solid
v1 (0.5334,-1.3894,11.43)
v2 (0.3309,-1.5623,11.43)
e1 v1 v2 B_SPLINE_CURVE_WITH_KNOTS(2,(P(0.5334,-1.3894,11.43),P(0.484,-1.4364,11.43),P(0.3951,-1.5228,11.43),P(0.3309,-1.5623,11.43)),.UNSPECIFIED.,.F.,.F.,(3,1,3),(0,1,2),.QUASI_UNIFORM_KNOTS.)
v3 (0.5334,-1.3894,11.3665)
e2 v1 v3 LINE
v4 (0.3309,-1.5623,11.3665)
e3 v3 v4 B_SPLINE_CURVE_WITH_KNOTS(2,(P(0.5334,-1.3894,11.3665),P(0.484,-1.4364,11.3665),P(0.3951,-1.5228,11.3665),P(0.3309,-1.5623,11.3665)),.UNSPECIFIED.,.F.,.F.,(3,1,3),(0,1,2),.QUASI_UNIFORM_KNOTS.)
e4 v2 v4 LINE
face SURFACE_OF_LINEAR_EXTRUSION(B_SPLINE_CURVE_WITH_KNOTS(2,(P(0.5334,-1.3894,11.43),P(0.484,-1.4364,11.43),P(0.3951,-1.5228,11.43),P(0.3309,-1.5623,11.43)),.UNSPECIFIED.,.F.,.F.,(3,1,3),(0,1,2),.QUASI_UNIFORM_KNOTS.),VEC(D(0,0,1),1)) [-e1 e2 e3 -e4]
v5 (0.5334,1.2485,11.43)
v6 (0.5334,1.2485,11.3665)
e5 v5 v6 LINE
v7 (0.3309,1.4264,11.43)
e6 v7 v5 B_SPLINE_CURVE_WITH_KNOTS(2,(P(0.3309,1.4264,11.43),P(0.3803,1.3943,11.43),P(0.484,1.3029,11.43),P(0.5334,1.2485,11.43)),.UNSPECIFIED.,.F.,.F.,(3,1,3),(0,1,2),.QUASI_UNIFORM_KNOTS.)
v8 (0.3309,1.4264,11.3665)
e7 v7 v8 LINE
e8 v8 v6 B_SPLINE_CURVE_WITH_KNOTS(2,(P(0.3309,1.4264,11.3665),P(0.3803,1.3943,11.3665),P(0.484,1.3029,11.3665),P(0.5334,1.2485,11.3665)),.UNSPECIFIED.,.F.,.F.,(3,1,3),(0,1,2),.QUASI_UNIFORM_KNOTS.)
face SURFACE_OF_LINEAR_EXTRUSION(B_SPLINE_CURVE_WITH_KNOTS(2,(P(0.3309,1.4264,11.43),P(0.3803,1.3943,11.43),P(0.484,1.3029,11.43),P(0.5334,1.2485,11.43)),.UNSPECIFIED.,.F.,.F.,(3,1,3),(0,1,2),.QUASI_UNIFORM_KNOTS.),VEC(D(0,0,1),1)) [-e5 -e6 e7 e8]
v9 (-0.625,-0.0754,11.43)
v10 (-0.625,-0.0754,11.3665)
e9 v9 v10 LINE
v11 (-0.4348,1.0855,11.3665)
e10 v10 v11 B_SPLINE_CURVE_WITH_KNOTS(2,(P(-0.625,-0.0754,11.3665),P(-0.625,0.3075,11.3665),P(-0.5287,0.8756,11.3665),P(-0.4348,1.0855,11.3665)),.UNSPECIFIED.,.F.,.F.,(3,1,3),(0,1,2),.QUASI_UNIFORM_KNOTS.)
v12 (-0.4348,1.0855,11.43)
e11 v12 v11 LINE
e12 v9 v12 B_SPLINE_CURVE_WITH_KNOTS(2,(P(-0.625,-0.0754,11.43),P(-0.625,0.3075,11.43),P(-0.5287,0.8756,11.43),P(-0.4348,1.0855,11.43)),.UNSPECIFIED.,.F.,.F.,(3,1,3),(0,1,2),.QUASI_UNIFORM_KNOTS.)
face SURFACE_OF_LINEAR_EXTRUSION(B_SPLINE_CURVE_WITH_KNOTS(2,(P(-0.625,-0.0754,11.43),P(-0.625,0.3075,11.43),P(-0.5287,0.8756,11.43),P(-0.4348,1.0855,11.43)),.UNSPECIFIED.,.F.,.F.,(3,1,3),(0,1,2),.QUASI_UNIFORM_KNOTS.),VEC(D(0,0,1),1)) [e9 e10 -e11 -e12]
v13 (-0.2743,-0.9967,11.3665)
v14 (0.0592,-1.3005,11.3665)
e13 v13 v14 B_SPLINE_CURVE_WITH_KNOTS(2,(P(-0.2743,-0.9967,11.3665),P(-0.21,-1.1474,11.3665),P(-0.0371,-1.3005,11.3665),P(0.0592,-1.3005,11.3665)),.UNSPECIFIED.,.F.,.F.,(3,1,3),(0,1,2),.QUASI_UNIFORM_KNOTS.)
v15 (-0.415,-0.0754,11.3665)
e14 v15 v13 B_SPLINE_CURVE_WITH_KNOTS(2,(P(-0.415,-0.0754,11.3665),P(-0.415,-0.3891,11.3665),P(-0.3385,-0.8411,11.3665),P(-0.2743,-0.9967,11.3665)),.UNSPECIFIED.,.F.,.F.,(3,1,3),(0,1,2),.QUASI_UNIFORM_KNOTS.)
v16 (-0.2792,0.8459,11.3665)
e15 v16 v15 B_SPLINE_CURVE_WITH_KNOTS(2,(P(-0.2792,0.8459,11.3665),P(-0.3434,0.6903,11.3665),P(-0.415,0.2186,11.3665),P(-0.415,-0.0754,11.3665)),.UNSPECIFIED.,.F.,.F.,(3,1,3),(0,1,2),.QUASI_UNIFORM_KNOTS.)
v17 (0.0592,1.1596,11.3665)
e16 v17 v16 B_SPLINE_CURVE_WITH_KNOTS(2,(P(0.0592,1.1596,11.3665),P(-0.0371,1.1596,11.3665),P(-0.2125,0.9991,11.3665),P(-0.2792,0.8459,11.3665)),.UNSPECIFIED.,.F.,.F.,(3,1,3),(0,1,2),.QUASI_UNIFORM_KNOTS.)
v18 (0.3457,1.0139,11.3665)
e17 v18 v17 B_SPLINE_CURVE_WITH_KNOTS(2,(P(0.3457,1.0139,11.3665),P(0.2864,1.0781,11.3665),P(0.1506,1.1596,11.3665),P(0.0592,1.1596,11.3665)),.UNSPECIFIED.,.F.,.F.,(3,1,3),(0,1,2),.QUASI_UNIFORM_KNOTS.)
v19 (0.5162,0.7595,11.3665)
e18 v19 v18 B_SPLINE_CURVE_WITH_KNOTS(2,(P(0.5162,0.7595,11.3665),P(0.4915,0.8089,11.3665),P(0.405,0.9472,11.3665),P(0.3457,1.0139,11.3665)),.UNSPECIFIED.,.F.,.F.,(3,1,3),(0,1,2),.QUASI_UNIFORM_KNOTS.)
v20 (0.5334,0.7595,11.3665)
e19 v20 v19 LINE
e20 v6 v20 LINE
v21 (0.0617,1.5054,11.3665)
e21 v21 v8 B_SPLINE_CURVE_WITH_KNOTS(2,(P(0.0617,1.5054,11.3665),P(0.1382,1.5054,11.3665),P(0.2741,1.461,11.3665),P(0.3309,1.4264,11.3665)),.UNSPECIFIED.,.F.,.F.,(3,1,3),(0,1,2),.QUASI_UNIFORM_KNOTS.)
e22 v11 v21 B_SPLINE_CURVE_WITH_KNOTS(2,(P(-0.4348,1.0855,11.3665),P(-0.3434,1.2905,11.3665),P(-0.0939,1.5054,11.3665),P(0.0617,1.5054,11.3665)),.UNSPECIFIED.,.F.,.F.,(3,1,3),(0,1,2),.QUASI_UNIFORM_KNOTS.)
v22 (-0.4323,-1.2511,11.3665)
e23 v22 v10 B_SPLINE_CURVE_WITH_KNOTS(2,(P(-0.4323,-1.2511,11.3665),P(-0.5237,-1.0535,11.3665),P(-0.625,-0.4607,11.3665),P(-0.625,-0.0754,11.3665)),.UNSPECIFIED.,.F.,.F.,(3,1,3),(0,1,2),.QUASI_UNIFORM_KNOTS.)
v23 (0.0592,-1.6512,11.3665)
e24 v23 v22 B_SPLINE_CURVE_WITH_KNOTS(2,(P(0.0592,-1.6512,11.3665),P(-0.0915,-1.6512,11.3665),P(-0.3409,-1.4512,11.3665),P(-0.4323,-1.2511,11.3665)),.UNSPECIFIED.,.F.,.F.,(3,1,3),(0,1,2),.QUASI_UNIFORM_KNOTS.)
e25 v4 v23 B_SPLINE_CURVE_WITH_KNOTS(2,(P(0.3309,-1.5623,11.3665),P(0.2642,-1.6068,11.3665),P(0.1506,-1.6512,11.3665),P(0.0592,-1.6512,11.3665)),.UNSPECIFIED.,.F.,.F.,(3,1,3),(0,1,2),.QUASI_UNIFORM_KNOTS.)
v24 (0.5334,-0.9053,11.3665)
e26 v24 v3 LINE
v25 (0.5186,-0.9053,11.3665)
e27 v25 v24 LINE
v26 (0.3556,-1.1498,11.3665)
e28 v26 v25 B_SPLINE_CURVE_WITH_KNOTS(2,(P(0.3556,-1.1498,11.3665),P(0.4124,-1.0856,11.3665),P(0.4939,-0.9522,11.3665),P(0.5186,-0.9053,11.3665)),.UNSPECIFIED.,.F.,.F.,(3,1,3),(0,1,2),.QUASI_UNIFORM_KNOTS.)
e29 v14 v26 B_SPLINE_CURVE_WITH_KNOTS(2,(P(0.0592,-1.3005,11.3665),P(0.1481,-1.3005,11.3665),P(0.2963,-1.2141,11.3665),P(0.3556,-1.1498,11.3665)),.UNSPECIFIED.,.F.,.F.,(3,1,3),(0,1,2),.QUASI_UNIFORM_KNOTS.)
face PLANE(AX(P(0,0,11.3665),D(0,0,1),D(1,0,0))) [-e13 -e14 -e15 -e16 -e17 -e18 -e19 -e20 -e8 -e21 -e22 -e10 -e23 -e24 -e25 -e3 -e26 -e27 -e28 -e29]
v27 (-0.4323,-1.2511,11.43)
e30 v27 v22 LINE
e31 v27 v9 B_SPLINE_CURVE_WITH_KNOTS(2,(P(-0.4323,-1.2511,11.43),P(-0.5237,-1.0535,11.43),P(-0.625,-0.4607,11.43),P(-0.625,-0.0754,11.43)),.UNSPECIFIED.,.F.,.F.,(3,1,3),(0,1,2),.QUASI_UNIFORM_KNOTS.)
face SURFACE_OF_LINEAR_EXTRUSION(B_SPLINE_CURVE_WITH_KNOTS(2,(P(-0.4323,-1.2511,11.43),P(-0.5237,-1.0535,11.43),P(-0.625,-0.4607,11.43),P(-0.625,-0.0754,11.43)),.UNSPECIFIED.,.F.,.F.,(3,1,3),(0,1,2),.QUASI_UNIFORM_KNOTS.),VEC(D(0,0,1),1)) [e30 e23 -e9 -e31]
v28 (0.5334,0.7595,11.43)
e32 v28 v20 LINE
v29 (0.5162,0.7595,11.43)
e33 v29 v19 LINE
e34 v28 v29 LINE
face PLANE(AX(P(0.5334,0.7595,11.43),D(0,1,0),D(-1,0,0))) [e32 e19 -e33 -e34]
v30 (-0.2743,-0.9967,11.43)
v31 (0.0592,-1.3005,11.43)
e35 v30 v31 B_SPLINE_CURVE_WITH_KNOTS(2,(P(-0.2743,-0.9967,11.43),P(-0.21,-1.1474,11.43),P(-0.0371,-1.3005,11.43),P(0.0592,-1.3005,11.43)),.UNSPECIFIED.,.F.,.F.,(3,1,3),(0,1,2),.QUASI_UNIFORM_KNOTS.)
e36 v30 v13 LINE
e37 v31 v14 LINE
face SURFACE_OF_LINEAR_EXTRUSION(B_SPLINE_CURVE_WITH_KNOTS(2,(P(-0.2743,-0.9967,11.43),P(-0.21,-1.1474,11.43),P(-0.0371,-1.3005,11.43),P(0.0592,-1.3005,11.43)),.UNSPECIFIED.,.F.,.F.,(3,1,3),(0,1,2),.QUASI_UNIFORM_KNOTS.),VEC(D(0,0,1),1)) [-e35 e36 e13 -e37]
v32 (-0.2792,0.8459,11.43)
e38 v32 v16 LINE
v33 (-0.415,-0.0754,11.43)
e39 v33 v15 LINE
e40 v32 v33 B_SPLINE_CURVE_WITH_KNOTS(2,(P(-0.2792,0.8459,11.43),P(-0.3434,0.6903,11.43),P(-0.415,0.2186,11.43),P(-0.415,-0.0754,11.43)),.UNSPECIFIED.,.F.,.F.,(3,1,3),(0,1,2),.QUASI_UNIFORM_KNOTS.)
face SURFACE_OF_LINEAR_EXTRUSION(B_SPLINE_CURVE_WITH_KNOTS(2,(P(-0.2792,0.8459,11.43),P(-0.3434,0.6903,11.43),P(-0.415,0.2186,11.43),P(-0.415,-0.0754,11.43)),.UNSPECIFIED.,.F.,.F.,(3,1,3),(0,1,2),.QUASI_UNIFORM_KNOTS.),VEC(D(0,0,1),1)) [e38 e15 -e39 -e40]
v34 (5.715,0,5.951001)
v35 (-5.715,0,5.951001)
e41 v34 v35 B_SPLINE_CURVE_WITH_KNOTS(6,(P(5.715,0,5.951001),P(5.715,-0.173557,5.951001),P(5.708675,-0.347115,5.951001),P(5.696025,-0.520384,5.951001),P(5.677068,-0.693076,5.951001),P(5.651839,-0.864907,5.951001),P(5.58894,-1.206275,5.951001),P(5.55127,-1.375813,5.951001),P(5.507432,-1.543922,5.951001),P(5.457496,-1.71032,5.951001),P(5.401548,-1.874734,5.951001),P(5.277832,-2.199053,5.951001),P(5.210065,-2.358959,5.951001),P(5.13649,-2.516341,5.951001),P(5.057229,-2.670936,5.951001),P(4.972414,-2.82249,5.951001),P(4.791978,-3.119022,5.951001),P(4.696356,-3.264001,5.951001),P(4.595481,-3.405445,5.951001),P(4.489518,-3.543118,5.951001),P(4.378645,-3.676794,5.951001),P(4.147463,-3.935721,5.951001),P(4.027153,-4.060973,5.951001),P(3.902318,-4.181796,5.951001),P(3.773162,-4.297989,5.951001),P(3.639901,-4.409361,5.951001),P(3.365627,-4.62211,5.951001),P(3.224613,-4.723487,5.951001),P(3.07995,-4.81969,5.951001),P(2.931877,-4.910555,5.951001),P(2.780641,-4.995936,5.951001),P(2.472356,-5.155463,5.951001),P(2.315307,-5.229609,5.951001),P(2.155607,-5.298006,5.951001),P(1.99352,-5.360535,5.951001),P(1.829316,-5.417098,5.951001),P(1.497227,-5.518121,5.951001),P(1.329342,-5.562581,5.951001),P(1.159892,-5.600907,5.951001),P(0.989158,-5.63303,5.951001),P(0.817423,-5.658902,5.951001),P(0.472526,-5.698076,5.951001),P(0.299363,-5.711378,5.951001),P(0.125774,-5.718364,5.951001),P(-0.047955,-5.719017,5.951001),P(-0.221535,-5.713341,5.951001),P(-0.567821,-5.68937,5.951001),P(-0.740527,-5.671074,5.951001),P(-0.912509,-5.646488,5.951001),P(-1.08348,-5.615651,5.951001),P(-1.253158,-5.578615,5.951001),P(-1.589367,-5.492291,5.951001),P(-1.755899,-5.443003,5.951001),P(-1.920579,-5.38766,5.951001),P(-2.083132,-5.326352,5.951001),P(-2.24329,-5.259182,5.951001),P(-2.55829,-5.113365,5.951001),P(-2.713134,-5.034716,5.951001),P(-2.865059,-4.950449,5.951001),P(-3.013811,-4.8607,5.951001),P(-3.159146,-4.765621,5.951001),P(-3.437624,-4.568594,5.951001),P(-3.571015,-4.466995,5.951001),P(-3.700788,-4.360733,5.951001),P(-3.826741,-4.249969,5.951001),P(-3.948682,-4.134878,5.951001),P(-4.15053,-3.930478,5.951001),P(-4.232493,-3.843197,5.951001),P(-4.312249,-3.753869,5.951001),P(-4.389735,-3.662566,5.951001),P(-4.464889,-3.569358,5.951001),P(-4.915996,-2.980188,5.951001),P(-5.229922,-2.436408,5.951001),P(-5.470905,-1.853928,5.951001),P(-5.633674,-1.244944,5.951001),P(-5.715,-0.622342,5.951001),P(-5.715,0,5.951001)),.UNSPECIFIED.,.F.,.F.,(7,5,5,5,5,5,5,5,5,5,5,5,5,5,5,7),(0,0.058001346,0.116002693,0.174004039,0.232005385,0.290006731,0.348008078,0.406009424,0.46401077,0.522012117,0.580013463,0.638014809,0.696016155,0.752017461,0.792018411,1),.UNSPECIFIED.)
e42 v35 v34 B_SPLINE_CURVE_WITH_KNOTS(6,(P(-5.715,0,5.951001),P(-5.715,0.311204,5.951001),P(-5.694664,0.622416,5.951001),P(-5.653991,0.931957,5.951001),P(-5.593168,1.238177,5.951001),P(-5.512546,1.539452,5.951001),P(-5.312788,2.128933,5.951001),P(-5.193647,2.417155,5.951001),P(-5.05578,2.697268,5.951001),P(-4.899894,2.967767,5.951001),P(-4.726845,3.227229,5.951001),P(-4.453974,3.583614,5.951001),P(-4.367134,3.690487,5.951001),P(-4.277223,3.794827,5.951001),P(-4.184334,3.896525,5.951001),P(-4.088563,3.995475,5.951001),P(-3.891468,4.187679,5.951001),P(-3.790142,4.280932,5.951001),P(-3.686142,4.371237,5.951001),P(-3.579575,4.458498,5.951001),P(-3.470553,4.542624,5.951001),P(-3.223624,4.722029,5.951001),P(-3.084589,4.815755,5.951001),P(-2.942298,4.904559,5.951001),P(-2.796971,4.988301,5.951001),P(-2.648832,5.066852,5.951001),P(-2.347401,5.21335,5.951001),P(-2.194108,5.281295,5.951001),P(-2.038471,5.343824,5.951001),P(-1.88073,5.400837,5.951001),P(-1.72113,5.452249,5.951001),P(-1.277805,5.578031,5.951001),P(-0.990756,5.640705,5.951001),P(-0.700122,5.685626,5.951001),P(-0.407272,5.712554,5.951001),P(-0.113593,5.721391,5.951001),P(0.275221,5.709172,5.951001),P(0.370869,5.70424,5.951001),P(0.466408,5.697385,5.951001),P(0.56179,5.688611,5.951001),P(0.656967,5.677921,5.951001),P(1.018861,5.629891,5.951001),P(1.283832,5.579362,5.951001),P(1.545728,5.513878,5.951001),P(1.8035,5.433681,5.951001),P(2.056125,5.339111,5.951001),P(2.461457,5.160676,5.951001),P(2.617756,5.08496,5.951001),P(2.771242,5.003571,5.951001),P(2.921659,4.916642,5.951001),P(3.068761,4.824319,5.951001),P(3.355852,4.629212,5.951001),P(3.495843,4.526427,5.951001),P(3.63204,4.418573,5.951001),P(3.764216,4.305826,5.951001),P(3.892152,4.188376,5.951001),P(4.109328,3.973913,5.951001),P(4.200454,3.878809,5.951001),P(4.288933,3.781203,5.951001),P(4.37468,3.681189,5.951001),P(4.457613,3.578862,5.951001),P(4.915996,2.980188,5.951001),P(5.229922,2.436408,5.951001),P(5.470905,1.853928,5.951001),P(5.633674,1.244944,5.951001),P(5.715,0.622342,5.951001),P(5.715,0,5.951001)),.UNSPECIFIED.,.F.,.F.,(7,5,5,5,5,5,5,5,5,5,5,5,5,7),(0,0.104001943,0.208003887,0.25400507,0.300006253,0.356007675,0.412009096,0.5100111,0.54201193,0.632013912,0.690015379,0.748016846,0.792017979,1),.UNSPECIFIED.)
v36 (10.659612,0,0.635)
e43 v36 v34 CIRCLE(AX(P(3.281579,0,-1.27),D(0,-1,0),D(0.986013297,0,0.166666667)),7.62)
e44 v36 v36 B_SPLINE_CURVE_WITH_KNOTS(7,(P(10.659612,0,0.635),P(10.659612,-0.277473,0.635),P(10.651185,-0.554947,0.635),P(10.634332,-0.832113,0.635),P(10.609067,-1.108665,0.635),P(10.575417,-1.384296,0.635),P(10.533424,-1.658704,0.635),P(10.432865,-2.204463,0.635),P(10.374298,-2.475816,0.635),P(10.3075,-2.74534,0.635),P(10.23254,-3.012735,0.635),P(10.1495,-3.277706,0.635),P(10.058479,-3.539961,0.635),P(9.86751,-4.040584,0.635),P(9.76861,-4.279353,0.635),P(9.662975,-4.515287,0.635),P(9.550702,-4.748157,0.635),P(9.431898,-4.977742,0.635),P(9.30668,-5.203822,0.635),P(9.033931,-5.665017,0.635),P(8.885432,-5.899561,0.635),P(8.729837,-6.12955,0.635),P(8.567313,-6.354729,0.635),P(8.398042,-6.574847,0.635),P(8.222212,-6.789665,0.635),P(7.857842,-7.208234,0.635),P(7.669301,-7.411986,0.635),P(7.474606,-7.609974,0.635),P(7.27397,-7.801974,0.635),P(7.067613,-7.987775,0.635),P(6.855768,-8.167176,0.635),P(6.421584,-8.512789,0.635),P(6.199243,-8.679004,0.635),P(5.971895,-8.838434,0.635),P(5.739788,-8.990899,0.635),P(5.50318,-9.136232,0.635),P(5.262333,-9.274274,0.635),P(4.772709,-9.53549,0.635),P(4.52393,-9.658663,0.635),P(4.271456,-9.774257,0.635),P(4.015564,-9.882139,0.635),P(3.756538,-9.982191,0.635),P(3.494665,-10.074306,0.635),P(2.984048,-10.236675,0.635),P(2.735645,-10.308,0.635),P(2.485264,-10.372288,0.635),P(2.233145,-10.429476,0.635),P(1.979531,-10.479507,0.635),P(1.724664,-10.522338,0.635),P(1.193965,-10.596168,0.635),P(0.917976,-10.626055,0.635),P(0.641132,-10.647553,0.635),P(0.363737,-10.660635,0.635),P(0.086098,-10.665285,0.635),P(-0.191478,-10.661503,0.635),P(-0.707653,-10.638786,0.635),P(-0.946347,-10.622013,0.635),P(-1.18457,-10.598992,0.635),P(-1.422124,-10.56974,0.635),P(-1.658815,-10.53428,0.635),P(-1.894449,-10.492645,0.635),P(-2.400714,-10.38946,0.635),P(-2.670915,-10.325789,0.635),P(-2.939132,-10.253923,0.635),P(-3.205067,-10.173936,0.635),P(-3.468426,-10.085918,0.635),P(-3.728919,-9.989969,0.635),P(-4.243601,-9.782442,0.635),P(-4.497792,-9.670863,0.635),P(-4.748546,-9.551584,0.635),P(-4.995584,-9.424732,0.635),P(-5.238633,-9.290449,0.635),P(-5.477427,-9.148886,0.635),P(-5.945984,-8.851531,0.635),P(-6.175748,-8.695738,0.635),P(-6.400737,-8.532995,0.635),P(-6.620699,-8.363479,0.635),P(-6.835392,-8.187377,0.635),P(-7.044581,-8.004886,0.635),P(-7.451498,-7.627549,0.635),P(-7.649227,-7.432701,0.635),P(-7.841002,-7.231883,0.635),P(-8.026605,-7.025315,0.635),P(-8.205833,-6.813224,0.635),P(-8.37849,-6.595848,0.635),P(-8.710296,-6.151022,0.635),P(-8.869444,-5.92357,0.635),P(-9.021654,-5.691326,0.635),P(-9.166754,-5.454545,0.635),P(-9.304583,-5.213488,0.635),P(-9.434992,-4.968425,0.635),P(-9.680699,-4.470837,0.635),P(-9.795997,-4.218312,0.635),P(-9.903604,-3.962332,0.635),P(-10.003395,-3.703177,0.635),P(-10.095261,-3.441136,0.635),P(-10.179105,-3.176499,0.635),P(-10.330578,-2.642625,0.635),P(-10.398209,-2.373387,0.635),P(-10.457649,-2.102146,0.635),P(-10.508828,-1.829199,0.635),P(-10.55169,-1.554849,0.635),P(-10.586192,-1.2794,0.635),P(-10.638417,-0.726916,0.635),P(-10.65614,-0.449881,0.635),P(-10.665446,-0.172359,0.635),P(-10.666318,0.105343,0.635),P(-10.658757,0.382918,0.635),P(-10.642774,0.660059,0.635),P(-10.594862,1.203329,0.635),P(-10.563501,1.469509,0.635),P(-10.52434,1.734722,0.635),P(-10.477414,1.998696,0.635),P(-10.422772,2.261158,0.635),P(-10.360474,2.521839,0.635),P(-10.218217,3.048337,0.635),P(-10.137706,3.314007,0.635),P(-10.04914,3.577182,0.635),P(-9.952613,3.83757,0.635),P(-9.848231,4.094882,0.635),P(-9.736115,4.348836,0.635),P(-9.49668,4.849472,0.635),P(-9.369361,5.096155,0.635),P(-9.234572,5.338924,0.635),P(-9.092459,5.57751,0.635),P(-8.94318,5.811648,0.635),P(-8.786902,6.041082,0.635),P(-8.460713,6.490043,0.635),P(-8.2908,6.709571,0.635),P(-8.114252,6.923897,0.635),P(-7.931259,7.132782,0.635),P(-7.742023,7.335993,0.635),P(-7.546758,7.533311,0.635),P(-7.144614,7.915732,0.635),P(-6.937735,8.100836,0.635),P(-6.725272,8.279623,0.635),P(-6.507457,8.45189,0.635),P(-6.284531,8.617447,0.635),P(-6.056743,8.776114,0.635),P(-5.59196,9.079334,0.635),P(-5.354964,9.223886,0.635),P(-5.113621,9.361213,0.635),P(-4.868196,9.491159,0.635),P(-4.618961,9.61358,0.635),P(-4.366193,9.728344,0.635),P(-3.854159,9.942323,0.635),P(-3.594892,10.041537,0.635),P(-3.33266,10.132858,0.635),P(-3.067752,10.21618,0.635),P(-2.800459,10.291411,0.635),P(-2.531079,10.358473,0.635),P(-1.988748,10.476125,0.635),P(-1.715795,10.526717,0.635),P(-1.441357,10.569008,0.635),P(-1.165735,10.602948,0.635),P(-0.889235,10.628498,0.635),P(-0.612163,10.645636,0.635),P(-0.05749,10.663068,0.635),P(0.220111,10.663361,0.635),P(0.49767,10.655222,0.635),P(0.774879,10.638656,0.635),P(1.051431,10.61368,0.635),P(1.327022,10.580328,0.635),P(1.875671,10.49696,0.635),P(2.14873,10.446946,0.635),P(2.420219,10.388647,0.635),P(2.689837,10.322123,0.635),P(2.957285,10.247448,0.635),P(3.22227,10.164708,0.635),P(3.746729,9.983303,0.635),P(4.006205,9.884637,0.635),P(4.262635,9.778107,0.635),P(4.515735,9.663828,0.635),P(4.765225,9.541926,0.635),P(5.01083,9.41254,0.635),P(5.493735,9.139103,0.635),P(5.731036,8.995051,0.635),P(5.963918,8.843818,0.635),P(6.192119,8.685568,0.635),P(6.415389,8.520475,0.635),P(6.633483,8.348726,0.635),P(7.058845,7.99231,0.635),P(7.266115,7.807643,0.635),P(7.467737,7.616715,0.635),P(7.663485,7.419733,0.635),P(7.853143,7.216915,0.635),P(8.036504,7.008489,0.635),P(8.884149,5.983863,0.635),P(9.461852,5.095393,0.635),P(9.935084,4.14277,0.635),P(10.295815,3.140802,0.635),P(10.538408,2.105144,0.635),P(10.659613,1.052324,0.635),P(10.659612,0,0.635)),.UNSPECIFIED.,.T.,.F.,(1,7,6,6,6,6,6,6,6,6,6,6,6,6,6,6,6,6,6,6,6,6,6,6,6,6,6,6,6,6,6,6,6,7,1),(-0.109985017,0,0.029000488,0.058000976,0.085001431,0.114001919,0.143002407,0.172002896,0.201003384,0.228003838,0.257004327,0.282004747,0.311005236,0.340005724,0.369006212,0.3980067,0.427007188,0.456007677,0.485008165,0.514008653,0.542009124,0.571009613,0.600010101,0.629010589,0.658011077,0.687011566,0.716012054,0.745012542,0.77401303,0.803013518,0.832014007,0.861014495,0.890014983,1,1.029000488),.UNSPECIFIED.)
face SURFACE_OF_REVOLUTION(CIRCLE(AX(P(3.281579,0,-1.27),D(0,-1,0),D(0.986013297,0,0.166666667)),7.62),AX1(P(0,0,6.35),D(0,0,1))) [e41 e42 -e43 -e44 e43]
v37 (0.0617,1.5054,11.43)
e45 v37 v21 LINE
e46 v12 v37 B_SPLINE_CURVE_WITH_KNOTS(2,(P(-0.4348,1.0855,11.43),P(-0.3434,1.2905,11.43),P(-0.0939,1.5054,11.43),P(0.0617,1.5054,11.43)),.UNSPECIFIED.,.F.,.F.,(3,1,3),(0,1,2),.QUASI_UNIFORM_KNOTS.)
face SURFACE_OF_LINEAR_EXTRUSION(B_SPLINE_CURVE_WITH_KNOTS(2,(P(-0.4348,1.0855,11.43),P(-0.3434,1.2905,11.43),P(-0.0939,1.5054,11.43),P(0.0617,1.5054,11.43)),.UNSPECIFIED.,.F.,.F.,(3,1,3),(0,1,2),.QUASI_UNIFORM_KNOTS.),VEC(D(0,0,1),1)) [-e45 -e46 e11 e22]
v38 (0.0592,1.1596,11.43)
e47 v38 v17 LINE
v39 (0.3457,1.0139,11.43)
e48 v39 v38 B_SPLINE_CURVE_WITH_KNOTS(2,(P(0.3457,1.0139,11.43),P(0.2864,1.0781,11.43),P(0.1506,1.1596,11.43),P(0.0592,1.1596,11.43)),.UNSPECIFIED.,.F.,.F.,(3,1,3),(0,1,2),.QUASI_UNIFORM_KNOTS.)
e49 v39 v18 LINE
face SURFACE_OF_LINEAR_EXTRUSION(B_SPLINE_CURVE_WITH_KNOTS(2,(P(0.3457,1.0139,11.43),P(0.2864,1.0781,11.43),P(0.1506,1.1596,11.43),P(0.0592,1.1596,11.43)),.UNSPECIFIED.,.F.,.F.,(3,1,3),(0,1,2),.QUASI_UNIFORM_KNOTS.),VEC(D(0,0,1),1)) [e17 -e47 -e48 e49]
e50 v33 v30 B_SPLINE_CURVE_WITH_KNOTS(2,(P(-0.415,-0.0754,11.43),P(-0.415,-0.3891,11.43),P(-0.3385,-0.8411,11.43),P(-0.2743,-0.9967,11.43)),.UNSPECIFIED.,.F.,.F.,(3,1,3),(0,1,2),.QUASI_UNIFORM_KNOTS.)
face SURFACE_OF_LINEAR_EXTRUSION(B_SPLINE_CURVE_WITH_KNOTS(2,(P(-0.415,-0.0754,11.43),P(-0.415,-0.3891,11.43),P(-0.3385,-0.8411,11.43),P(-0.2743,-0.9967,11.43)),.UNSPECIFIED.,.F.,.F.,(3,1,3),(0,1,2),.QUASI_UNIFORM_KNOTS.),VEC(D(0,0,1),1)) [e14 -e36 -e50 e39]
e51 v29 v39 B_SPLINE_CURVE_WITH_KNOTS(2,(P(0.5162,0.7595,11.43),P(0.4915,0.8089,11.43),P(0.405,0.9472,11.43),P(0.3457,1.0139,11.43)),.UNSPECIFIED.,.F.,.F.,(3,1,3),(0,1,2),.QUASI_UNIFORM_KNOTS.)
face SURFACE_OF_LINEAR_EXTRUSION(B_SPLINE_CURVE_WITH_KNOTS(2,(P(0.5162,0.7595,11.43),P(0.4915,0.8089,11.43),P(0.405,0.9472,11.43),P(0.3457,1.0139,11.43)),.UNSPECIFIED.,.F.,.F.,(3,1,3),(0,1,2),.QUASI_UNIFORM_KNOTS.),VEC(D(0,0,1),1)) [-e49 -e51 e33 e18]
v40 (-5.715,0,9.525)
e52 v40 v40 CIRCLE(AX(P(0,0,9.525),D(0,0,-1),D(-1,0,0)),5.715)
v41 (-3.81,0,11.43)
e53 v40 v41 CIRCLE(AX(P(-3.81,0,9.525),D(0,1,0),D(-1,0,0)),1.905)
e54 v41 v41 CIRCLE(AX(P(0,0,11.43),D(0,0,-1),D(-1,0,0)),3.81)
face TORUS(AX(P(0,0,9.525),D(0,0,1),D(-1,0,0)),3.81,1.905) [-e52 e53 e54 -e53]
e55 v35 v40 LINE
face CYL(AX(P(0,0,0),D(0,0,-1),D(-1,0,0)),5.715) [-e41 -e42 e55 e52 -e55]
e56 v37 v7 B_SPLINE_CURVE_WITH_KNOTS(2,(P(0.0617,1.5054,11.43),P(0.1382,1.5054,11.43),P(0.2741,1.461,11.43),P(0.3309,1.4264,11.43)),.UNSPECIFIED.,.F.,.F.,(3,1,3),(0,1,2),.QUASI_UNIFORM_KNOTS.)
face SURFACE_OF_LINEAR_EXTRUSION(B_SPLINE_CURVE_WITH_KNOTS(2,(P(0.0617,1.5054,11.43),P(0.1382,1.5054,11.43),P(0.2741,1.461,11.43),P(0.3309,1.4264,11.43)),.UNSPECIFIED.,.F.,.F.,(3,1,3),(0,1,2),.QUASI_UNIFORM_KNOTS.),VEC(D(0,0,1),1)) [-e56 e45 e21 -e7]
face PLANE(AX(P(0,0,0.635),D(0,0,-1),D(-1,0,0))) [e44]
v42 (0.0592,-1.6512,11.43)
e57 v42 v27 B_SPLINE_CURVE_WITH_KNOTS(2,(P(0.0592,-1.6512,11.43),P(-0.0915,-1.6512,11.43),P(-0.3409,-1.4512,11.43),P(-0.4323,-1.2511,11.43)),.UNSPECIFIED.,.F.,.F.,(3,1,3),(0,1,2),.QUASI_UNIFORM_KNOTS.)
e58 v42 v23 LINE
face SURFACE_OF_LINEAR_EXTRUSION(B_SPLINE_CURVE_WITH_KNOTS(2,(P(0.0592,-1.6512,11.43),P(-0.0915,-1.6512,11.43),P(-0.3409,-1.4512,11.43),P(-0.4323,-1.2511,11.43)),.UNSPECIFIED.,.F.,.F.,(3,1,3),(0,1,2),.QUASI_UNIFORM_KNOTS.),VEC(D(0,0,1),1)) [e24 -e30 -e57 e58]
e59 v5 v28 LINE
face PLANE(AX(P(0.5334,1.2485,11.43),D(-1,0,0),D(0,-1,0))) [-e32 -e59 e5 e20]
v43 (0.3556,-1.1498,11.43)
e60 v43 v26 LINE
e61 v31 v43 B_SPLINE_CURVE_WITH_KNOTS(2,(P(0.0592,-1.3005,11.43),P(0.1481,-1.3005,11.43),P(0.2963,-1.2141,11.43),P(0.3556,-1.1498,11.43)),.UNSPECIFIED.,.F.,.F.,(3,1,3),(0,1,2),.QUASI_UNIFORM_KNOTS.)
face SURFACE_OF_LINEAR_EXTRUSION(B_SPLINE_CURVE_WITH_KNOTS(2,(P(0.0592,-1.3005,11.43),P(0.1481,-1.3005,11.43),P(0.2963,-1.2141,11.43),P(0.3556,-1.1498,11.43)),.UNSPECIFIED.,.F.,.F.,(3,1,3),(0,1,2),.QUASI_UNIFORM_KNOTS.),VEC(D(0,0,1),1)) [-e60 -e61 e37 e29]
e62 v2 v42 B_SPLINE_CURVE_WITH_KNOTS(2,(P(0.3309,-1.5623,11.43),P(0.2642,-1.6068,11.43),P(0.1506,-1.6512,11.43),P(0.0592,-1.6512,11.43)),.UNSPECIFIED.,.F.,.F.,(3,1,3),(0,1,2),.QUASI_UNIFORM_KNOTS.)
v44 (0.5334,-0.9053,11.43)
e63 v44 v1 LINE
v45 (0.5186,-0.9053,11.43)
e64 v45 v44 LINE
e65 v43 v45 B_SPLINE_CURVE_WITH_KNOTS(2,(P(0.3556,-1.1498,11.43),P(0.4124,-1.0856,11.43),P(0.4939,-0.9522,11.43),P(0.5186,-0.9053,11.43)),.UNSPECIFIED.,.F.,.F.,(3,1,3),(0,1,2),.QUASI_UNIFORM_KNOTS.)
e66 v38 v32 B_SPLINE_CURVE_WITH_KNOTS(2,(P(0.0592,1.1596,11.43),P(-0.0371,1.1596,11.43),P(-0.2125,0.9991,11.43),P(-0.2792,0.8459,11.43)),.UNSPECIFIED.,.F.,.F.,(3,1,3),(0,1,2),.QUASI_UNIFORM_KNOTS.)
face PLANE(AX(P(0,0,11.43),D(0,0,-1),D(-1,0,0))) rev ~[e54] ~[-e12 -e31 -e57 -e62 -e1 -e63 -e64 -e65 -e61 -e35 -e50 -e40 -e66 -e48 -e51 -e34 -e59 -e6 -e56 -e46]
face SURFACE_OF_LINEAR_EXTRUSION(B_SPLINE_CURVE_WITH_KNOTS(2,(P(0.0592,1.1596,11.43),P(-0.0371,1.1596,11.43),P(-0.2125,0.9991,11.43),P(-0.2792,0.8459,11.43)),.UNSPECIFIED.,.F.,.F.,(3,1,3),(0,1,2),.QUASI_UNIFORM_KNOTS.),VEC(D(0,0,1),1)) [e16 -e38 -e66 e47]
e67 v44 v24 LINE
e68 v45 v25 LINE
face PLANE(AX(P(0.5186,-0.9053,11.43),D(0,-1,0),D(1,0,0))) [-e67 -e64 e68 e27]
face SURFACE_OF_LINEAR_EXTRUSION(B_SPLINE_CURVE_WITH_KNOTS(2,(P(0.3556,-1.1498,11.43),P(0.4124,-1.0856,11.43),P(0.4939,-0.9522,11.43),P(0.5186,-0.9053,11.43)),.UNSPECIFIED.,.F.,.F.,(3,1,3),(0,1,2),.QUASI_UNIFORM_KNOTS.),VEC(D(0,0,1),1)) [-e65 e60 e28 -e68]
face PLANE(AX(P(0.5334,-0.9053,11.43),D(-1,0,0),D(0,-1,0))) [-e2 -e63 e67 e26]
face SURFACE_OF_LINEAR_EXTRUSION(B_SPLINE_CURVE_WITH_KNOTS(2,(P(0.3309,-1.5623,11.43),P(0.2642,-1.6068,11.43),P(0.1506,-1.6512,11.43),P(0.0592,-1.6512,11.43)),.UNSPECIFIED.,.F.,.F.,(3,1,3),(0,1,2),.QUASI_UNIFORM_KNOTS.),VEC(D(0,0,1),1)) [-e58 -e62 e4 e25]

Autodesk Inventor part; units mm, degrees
ref_plane "YZ Plane" through (0, 0, 0) normal (1, 0, 0) x (0, 1, 0)
ref_plane "XZ Plane" through (0, 0, 0) normal (0, 1, 0) x (-1, 0, 0)
ref_plane "XY Plane" through (0, 0, 0) normal (0, 0, 1) x (1, 0, 0)
sketch "Sketch1" plane through (0, 0, 0) normal (0, 0, 1) x (1, 0, 0)
  circle A0 centre (0, 0) radius 10.795
  dimension "d0" = 21.59
extrude "Extrusion1" add sketch "Sketch1" along normal blind 6.35
fillet "Fillet1" radius 7.62 1 edges at (-10.795, 0, 6.35)
sketch "Sketch2" plane through (0, 0, 0) normal (0, 0, -1) x (-1, 0, 0)
  circle A0 centre (0, 0) radius 10.795 projected
  circle A1 centre (0, 0) radius 5.715
  dimension "d4" = 11.43
extrude "Extrusion2" add sketch "Sketch2" against normal blind 11.43 contours A1
fillet "Fillet2" radius 1.905 1 edges at (5.715, 0, 11.43)
sketch "Sketch3" plane through (0, 0, 11.43) normal (0, 0, 1) x (1, 0, 0)
  line L0 (-0.6917, 1.5054) -> (0.568, 1.5054) construction
  line L1 (0.568, 1.5054) -> (0.568, -1.6512) construction
  line L2 (0.568, -1.6512) -> (-0.6917, -1.6512) construction
  line L3 (-0.6917, -1.6512) -> (-0.6917, 1.5054) construction
  spline S0 degree 2 poles (0.0592, -1.6512) (-0.0915, -1.6512) (-0.3409, -1.4512) (-0.4323, -1.2511) knots 0 0 0 1 2 2 2
  spline S1 degree 2 poles (-0.4323, -1.2511) (-0.5237, -1.0535) (-0.625, -0.4607) (-0.625, -0.0754) knots 0 0 0 1 2 2 2
  spline S2 degree 2 poles (-0.625, -0.0754) (-0.625, 0.3075) (-0.5287, 0.8756) (-0.4348, 1.0855) knots 0 0 0 1 2 2 2
  spline S3 degree 2 poles (-0.4348, 1.0855) (-0.3434, 1.2905) (-0.0939, 1.5054) (0.0617, 1.5054) knots 0 0 0 1 2 2 2
  spline S4 degree 2 poles (0.0617, 1.5054) (0.1382, 1.5054) (0.2741, 1.461) (0.3309, 1.4264) knots 0 0 0 1 2 2 2
  spline S5 degree 2 poles (0.3309, 1.4264) (0.3803, 1.3943) (0.484, 1.3029) (0.5334, 1.2485) knots 0 0 0 1 2 2 2
  line L4 (0.5334, 1.2485) -> (0.5334, 0.7595)
  line L5 (0.5334, 0.7595) -> (0.5162, 0.7595)
  spline S6 degree 2 poles (0.5162, 0.7595) (0.4915, 0.8089) (0.405, 0.9472) (0.3457, 1.0139) knots 0 0 0 1 2 2 2
  spline S7 degree 2 poles (0.3457, 1.0139) (0.2864, 1.0781) (0.1506, 1.1596) (0.0592, 1.1596) knots 0 0 0 1 2 2 2
  spline S8 degree 2 poles (0.0592, 1.1596) (-0.0371, 1.1596) (-0.2125, 0.9991) (-0.2792, 0.8459) knots 0 0 0 1 2 2 2
  spline S9 degree 2 poles (-0.2792, 0.8459) (-0.3434, 0.6903) (-0.415, 0.2186) (-0.415, -0.0754) knots 0 0 0 1 2 2 2
  spline S10 degree 2 poles (-0.415, -0.0754) (-0.415, -0.3891) (-0.3385, -0.8411) (-0.2743, -0.9967) knots 0 0 0 1 2 2 2
  spline S11 degree 2 poles (-0.2743, -0.9967) (-0.21, -1.1474) (-0.0371, -1.3005) (0.0592, -1.3005) knots 0 0 0 1 2 2 2
  spline S12 degree 2 poles (0.0592, -1.3005) (0.1481, -1.3005) (0.2963, -1.2141) (0.3556, -1.1498) knots 0 0 0 1 2 2 2
  spline S13 degree 2 poles (0.3556, -1.1498) (0.4124, -1.0856) (0.4939, -0.9522) (0.5186, -0.9053) knots 0 0 0 1 2 2 2
  line L6 (0.5186, -0.9053) -> (0.5334, -0.9053)
  line L7 (0.5334, -0.9053) -> (0.5334, -1.3894)
  spline S14 degree 2 poles (0.5334, -1.3894) (0.484, -1.4364) (0.3951, -1.5228) (0.3309, -1.5623) knots 0 0 0 1 2 2 2
  spline S15 degree 2 poles (0.3309, -1.5623) (0.2642, -1.6068) (0.1506, -1.6512) (0.0592, -1.6512) knots 0 0 0 1 2 2 2
extrude "Extrusion3" cut sketch "Sketch3" against normal blind 0.0635
sketch "Sketch4" plane through (0, 0, 0) normal (0, 0, -1) x (-1, 0, 0)
  circle A0 centre (0, 0) radius 10.795 projected
extrude "Extrusion4" cut sketch "Sketch4" against normal blind 0.635
properties part number "C Stick"
